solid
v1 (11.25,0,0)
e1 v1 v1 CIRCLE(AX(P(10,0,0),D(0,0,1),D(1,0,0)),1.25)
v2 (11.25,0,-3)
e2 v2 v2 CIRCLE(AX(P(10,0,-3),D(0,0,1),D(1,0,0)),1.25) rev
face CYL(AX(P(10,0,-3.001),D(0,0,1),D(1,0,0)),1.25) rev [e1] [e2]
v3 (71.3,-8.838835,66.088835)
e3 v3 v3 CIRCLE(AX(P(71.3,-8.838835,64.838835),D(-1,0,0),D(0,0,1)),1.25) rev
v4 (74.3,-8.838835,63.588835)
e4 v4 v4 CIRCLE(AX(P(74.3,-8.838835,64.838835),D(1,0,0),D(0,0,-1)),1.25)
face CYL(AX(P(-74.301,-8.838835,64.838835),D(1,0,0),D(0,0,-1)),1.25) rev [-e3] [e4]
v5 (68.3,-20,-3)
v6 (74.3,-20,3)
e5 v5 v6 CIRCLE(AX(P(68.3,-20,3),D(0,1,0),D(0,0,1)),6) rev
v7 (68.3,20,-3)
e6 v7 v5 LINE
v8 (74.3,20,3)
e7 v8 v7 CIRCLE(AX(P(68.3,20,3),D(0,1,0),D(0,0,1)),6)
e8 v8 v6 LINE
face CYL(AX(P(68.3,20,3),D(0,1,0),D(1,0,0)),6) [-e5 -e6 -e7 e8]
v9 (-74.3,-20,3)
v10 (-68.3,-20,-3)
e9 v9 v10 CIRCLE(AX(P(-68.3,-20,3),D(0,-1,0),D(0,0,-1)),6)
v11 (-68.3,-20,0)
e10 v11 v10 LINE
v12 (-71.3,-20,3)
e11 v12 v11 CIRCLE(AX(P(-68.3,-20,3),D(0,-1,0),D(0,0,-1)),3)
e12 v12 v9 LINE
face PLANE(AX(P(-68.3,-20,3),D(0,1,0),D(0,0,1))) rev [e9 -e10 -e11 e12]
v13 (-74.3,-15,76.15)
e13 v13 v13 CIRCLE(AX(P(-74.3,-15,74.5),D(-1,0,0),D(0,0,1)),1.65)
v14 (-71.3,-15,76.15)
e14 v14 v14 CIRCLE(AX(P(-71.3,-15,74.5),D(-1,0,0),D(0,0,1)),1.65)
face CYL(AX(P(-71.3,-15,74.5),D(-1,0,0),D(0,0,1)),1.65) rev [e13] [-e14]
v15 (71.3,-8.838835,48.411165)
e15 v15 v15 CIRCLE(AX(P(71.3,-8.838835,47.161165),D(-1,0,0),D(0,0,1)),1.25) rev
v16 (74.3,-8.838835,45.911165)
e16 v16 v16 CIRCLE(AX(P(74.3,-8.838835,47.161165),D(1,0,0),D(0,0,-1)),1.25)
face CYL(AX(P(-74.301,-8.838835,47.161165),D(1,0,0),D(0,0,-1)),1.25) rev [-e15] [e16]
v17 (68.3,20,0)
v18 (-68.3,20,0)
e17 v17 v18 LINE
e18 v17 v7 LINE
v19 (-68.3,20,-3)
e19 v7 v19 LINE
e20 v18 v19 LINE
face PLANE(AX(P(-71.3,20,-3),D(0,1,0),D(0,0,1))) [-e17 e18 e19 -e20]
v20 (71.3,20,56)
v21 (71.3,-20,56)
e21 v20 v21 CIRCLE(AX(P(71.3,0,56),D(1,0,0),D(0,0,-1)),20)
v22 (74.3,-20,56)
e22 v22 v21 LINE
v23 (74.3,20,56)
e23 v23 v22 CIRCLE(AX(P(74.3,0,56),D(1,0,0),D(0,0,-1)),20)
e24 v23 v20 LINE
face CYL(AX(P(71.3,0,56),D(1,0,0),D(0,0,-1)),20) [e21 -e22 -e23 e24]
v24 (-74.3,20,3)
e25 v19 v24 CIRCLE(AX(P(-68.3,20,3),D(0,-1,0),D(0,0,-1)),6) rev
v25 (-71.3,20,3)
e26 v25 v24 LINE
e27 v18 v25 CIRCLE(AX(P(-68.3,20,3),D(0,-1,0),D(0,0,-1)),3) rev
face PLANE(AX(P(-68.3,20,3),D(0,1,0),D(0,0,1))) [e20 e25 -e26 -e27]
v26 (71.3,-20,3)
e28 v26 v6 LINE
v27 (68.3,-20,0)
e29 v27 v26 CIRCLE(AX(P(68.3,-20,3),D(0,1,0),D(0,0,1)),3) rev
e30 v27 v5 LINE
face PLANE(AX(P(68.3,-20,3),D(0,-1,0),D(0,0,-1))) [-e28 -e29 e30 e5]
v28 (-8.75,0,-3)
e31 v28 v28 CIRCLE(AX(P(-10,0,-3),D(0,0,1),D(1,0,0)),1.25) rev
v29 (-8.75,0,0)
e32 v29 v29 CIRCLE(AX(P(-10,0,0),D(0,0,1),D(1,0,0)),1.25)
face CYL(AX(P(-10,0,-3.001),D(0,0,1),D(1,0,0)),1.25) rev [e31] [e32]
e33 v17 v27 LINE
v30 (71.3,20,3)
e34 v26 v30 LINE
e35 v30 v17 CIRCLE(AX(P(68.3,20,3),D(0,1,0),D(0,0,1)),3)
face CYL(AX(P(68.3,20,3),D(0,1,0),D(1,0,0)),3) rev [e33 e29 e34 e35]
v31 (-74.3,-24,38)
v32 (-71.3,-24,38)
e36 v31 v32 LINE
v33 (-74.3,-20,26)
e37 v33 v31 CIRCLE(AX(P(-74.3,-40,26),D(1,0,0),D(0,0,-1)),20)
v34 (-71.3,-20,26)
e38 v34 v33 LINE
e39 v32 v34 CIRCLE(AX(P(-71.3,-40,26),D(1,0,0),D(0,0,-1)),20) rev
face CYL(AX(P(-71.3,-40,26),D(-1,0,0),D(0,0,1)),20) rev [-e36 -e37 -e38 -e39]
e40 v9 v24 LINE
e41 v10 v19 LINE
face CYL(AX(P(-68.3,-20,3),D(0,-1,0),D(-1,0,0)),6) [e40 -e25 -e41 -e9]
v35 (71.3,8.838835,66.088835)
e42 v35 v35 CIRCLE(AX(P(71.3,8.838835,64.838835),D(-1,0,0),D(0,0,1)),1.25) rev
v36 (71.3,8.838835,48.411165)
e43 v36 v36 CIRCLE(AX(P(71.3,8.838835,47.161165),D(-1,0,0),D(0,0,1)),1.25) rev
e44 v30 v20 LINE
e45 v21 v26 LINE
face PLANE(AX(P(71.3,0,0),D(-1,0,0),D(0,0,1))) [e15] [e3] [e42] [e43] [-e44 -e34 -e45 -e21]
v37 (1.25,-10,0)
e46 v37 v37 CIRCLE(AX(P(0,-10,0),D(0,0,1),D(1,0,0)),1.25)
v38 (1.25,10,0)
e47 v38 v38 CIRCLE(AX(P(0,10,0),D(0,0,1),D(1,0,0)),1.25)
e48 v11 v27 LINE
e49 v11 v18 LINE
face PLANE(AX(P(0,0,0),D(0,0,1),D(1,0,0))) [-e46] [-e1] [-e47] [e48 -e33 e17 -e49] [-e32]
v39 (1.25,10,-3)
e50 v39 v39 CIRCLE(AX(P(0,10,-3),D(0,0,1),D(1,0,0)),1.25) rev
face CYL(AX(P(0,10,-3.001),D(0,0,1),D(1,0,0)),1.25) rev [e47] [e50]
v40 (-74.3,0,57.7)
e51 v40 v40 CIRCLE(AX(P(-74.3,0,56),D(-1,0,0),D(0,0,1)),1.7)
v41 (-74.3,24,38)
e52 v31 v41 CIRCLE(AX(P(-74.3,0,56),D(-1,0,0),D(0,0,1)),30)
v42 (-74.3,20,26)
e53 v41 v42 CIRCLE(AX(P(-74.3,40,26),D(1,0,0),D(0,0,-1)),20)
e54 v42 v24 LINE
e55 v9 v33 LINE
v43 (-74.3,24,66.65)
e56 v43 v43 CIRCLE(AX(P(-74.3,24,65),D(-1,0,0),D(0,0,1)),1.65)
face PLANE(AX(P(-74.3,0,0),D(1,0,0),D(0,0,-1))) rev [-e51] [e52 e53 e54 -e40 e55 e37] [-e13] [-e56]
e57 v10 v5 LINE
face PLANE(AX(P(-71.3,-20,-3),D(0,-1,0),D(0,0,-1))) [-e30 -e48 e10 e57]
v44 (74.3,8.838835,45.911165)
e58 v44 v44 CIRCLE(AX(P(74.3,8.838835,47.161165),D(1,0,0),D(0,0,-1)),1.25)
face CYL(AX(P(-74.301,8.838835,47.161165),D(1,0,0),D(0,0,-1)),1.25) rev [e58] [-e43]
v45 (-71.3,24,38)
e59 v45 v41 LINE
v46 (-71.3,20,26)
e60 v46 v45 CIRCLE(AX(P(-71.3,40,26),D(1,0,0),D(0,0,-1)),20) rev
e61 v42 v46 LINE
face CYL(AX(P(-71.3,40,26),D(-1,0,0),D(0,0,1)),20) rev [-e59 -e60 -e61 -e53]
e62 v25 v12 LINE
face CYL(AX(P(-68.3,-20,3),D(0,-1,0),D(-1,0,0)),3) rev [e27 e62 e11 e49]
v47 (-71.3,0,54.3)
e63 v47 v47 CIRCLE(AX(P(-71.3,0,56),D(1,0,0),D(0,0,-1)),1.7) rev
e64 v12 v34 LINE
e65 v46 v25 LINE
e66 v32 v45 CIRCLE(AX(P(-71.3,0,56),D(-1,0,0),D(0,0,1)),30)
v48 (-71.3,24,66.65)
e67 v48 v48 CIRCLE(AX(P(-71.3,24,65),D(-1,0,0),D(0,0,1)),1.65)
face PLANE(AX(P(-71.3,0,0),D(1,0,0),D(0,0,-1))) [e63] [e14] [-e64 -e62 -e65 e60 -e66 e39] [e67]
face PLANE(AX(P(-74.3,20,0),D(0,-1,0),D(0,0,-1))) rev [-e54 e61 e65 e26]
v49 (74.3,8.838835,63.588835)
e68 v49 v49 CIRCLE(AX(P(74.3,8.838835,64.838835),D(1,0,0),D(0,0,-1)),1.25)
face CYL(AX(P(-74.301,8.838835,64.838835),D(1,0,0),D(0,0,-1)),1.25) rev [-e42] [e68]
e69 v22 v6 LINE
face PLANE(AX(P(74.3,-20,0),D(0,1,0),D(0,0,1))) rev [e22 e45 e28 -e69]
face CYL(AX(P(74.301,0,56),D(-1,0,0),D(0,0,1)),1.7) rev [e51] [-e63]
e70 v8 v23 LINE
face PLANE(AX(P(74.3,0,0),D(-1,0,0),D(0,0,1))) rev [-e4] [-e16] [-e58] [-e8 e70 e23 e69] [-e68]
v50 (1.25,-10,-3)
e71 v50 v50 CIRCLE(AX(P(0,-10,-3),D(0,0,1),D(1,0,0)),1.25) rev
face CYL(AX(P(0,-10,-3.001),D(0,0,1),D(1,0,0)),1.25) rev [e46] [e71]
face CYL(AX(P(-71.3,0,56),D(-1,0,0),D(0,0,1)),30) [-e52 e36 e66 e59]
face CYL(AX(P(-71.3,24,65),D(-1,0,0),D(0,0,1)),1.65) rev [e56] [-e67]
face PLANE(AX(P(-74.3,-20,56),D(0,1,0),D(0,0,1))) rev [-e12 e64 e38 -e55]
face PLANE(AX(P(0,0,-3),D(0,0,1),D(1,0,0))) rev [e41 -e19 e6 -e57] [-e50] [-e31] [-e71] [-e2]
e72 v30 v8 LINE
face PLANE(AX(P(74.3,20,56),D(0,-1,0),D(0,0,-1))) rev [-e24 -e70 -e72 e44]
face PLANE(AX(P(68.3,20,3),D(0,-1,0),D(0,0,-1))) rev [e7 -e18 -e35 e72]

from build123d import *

# Parameters (mm, degrees)
ESQUISSE1_W                           = 142.6
ESQUISSE1_H                           = 40
T_LE_DE_BASE_PLI_E1_DEPTH             = 3
T_LE_PLI_E_SUR_AR_TE1_STRIP_W         = 18
T_LE_PLI_E_SUR_AR_TE1_STRIP_H         = 3
T_LE_PLI_E_SUR_AR_TE1_STRIP_CUT_DEPTH = 40
T_LE_PLI_E_SUR_AR_TE1_DEPTH           = 40
T_LE_PLI_E_SUR_AR_TE2_STRIP_W         = 18
T_LE_PLI_E_SUR_AR_TE2_STRIP_H         = 3
T_LE_PLI_E_SUR_AR_TE2_STRIP_CUT_DEPTH = 40
T_LE_PLI_E_SUR_AR_TE2_DEPTH           = 40
ENL_V_MAT_EXTRU_1_REACH               = 97.166
ESQUISSE14_R                          = 1.25
PATTE1_DEPTH                          = 3
ENL_V_MAT_EXTRU_2_REACH               = 170.101
ESQUISSE19_R                          = 1.25
PATTE2_START                          = -3
PATTE2_DEPTH                          = 3
ENL_V_MAT_EXTRU_3_REACH               = 170.101
ESQUISSE24_R                          = 1.7
ESQUISSE25_R                          = 30
ESQUISSE25_R_2                        = 1.65
ESQUISSE25_R_3                        = 1.7
BOSS_EXTRU_1_DEPTH                    = 3
CONG_1_R                              = 20


# Sheet-metal steps are written as plain solids
with BuildPart() as part:
    # Esquisse1 → Tôle de base pliée1 (new body)
    with BuildSketch(Plane.XY):
        Rectangle(ESQUISSE1_W, ESQUISSE1_H)
    extrude(amount=-T_LE_DE_BASE_PLI_E1_DEPTH)

    # Tôle pliée sur arête1 strip (across the edge) → Tôle pliée sur arête1 strip cut (cut)
    with BuildSketch(Plane(origin=(-71.3, 20, 0), x_dir=(1, 0, 0), z_dir=(0, -1, 0))):
        with Locations((-6, -1.5)):
            Rectangle(T_LE_PLI_E_SUR_AR_TE1_STRIP_W, T_LE_PLI_E_SUR_AR_TE1_STRIP_H)
    extrude(amount=T_LE_PLI_E_SUR_AR_TE1_STRIP_CUT_DEPTH, mode=Mode.SUBTRACT)

    # Tôle pliée sur arête1 section (across the edge) → Tôle pliée sur arête1 (add)
    with BuildSketch(Plane(origin=(-71.3, 20, 0), x_dir=(1, 0, 0), z_dir=(0, -1, 0))):
        with BuildLine():
            Line((-3, 3), (-3, 56))
            Line((-3, 56), (0, 56))
            Line((0, 56), (0, 3))
            ThreePointArc((0, 3), (0.878679656, 0.878679656), (3, 0))
            Line((3, 0), (3, -3))
            ThreePointArc((3, -3), (-1.242640687, -1.242640687), (-3, 3))
        make_face()
    extrude(amount=T_LE_PLI_E_SUR_AR_TE1_DEPTH)

    # Tôle pliée sur arête2 strip (across the edge) → Tôle pliée sur arête2 strip cut (cut)
    with BuildSketch(Plane(origin=(71.3, -20, 0), x_dir=(-1, 0, 0), z_dir=(0, 1, 0))):
        with Locations((-6, -1.5)):
            Rectangle(T_LE_PLI_E_SUR_AR_TE2_STRIP_W, T_LE_PLI_E_SUR_AR_TE2_STRIP_H)
    extrude(amount=T_LE_PLI_E_SUR_AR_TE2_STRIP_CUT_DEPTH, mode=Mode.SUBTRACT)

    # Tôle pliée sur arête2 section (across the edge) → Tôle pliée sur arête2 (add)
    with BuildSketch(Plane(origin=(71.3, -20, 0), x_dir=(-1, 0, 0), z_dir=(0, 1, 0))):
        with BuildLine():
            Line((-3, 3), (-3, 56))
            Line((-3, 56), (0, 56))
            Line((0, 56), (0, 3))
            ThreePointArc((0, 3), (0.878679656, 0.878679656), (3, 0))
            Line((3, 0), (3, -3))
            ThreePointArc((3, -3), (-1.242640687, -1.242640687), (-3, 3))
        make_face()
    extrude(amount=T_LE_PLI_E_SUR_AR_TE2_DEPTH)

    # Esquisse14 → Enlèv. mat.-Extru.1 (cut, up to next)
    with BuildSketch(Plane.XY, mode=Mode.PRIVATE) as enl_v_mat_extru_1_sk1:
        with Locations((0, 10)):
            Circle(ESQUISSE14_R)
    enl_v_mat_extru_1_tool1 = extrude(enl_v_mat_extru_1_sk1.sketch, amount=-ENL_V_MAT_EXTRU_1_REACH, mode=Mode.PRIVATE) & part.part
    # Esquisse14 → Enlèv. mat.-Extru.1 (cut, up to next)
    with BuildSketch(Plane.XY, mode=Mode.PRIVATE) as enl_v_mat_extru_1_sk2:
        with Locations((10, 0)):
            Circle(ESQUISSE14_R)
    enl_v_mat_extru_1_tool2 = extrude(enl_v_mat_extru_1_sk2.sketch, amount=-ENL_V_MAT_EXTRU_1_REACH, mode=Mode.PRIVATE) & part.part
    # Esquisse14 → Enlèv. mat.-Extru.1 (cut, up to next)
    with BuildSketch(Plane.XY, mode=Mode.PRIVATE) as enl_v_mat_extru_1_sk3:
        with Locations((0, -10)):
            Circle(ESQUISSE14_R)
    enl_v_mat_extru_1_tool3 = extrude(enl_v_mat_extru_1_sk3.sketch, amount=-ENL_V_MAT_EXTRU_1_REACH, mode=Mode.PRIVATE) & part.part
    # Esquisse14 → Enlèv. mat.-Extru.1 (cut, up to next)
    with BuildSketch(Plane.XY, mode=Mode.PRIVATE) as enl_v_mat_extru_1_sk4:
        with Locations((-10, 0)):
            Circle(ESQUISSE14_R)
    enl_v_mat_extru_1_tool4 = extrude(enl_v_mat_extru_1_sk4.sketch, amount=-ENL_V_MAT_EXTRU_1_REACH, mode=Mode.PRIVATE) & part.part
    add(enl_v_mat_extru_1_tool1.solids().sort_by_distance((0, 10, 0))[0], mode=Mode.SUBTRACT)
    add(enl_v_mat_extru_1_tool2.solids().sort_by_distance((10, 0, 0))[0], mode=Mode.SUBTRACT)
    add(enl_v_mat_extru_1_tool3.solids().sort_by_distance((0, -10, 0))[0], mode=Mode.SUBTRACT)
    add(enl_v_mat_extru_1_tool4.solids().sort_by_distance((-10, 0, 0))[0], mode=Mode.SUBTRACT)

    # Esquisse16 → Patte1 (add)
    with BuildSketch(Plane(origin=(74.3, 0, 0), x_dir=(0, 0, -1), z_dir=(1, 0, 0))):
        with BuildLine():
            Line((-56, 20), (-56, -20))
            ThreePointArc((-56, -20), (-76, 0), (-56, 20))
        make_face()
    extrude(amount=-PATTE1_DEPTH)

    # Esquisse19 → Enlèv. mat.-Extru.2 (cut, up to next)
    with BuildSketch(Plane(origin=(74.3, 0, 0), x_dir=(0, 0, -1), z_dir=(1, 0, 0)), mode=Mode.PRIVATE) as enl_v_mat_extru_2_sk1:
        with Locations((-64.838834765, 8.838834765)):
            Circle(ESQUISSE19_R)
    enl_v_mat_extru_2_tool1 = extrude(enl_v_mat_extru_2_sk1.sketch, amount=-ENL_V_MAT_EXTRU_2_REACH, mode=Mode.PRIVATE) & part.part
    # Esquisse19 → Enlèv. mat.-Extru.2 (cut, up to next)
    with BuildSketch(Plane(origin=(74.3, 0, 0), x_dir=(0, 0, -1), z_dir=(1, 0, 0)), mode=Mode.PRIVATE) as enl_v_mat_extru_2_sk2:
        with Locations((-47.161165235, 8.838834765)):
            Circle(ESQUISSE19_R)
    enl_v_mat_extru_2_tool2 = extrude(enl_v_mat_extru_2_sk2.sketch, amount=-ENL_V_MAT_EXTRU_2_REACH, mode=Mode.PRIVATE) & part.part
    # Esquisse19 → Enlèv. mat.-Extru.2 (cut, up to next)
    with BuildSketch(Plane(origin=(74.3, 0, 0), x_dir=(0, 0, -1), z_dir=(1, 0, 0)), mode=Mode.PRIVATE) as enl_v_mat_extru_2_sk3:
        with Locations((-47.161165235, -8.838834765)):
            Circle(ESQUISSE19_R)
    enl_v_mat_extru_2_tool3 = extrude(enl_v_mat_extru_2_sk3.sketch, amount=-ENL_V_MAT_EXTRU_2_REACH, mode=Mode.PRIVATE) & part.part
    # Esquisse19 → Enlèv. mat.-Extru.2 (cut, up to next)
    with BuildSketch(Plane(origin=(74.3, 0, 0), x_dir=(0, 0, -1), z_dir=(1, 0, 0)), mode=Mode.PRIVATE) as enl_v_mat_extru_2_sk4:
        with Locations((-64.838834765, -8.838834765)):
            Circle(ESQUISSE19_R)
    enl_v_mat_extru_2_tool4 = extrude(enl_v_mat_extru_2_sk4.sketch, amount=-ENL_V_MAT_EXTRU_2_REACH, mode=Mode.PRIVATE) & part.part
    add(enl_v_mat_extru_2_tool1.solids().sort_by_distance((74.3, 8.838835, 64.838835))[0], mode=Mode.SUBTRACT)
    add(enl_v_mat_extru_2_tool2.solids().sort_by_distance((74.3, 8.838835, 47.161165))[0], mode=Mode.SUBTRACT)
    add(enl_v_mat_extru_2_tool3.solids().sort_by_distance((74.3, -8.838835, 47.161165))[0], mode=Mode.SUBTRACT)
    add(enl_v_mat_extru_2_tool4.solids().sort_by_distance((74.3, -8.838835, 64.838835))[0], mode=Mode.SUBTRACT)

    # Esquisse20 → Patte2 (add)
    with BuildSketch(Plane.ZY.offset(74.3).offset(PATTE2_START)):
        with BuildLine():
            Line((56, 20), (56, -20))
            ThreePointArc((56, -20), (76, 0), (56, 20))
        make_face()
    extrude(amount=PATTE2_DEPTH)

    # Esquisse24 → Enlèv. mat.-Extru.3 (cut, up to next)
    with BuildSketch(Plane.ZY.offset(74.3), mode=Mode.PRIVATE) as enl_v_mat_extru_3_sk1:
        with Locations((56, 0)):
            Circle(ESQUISSE24_R)
    enl_v_mat_extru_3_tool1 = extrude(enl_v_mat_extru_3_sk1.sketch, amount=-ENL_V_MAT_EXTRU_3_REACH, mode=Mode.PRIVATE) & part.part
    add(enl_v_mat_extru_3_tool1.solids().sort_by_distance((-74.3, 0, 56))[0], mode=Mode.SUBTRACT)

    # Esquisse25 → Boss.-Extru.1 (add)
    with BuildSketch(Plane.ZY.offset(74.3)):
        with Locations((56, 0)):
            Circle(ESQUISSE25_R)
        with Locations((65, 24)):
            Circle(ESQUISSE25_R_2, mode=Mode.SUBTRACT)
        with Locations((74.5, -15)):
            Circle(ESQUISSE25_R_2, mode=Mode.SUBTRACT)
        with Locations((56, 0)):
            Circle(ESQUISSE25_R_3, mode=Mode.SUBTRACT)
    extrude(amount=-BOSS_EXTRU_1_DEPTH)

    # Congé1
    cong_1_edges = [part.edges().sort_by_distance(p)[0] for p in [
        (-72.8, 20, 33.639320225),
        (-72.8, -20, 33.639320225),
    ]]
    fillet(cong_1_edges, radius=CONG_1_R)


solid = part.part
